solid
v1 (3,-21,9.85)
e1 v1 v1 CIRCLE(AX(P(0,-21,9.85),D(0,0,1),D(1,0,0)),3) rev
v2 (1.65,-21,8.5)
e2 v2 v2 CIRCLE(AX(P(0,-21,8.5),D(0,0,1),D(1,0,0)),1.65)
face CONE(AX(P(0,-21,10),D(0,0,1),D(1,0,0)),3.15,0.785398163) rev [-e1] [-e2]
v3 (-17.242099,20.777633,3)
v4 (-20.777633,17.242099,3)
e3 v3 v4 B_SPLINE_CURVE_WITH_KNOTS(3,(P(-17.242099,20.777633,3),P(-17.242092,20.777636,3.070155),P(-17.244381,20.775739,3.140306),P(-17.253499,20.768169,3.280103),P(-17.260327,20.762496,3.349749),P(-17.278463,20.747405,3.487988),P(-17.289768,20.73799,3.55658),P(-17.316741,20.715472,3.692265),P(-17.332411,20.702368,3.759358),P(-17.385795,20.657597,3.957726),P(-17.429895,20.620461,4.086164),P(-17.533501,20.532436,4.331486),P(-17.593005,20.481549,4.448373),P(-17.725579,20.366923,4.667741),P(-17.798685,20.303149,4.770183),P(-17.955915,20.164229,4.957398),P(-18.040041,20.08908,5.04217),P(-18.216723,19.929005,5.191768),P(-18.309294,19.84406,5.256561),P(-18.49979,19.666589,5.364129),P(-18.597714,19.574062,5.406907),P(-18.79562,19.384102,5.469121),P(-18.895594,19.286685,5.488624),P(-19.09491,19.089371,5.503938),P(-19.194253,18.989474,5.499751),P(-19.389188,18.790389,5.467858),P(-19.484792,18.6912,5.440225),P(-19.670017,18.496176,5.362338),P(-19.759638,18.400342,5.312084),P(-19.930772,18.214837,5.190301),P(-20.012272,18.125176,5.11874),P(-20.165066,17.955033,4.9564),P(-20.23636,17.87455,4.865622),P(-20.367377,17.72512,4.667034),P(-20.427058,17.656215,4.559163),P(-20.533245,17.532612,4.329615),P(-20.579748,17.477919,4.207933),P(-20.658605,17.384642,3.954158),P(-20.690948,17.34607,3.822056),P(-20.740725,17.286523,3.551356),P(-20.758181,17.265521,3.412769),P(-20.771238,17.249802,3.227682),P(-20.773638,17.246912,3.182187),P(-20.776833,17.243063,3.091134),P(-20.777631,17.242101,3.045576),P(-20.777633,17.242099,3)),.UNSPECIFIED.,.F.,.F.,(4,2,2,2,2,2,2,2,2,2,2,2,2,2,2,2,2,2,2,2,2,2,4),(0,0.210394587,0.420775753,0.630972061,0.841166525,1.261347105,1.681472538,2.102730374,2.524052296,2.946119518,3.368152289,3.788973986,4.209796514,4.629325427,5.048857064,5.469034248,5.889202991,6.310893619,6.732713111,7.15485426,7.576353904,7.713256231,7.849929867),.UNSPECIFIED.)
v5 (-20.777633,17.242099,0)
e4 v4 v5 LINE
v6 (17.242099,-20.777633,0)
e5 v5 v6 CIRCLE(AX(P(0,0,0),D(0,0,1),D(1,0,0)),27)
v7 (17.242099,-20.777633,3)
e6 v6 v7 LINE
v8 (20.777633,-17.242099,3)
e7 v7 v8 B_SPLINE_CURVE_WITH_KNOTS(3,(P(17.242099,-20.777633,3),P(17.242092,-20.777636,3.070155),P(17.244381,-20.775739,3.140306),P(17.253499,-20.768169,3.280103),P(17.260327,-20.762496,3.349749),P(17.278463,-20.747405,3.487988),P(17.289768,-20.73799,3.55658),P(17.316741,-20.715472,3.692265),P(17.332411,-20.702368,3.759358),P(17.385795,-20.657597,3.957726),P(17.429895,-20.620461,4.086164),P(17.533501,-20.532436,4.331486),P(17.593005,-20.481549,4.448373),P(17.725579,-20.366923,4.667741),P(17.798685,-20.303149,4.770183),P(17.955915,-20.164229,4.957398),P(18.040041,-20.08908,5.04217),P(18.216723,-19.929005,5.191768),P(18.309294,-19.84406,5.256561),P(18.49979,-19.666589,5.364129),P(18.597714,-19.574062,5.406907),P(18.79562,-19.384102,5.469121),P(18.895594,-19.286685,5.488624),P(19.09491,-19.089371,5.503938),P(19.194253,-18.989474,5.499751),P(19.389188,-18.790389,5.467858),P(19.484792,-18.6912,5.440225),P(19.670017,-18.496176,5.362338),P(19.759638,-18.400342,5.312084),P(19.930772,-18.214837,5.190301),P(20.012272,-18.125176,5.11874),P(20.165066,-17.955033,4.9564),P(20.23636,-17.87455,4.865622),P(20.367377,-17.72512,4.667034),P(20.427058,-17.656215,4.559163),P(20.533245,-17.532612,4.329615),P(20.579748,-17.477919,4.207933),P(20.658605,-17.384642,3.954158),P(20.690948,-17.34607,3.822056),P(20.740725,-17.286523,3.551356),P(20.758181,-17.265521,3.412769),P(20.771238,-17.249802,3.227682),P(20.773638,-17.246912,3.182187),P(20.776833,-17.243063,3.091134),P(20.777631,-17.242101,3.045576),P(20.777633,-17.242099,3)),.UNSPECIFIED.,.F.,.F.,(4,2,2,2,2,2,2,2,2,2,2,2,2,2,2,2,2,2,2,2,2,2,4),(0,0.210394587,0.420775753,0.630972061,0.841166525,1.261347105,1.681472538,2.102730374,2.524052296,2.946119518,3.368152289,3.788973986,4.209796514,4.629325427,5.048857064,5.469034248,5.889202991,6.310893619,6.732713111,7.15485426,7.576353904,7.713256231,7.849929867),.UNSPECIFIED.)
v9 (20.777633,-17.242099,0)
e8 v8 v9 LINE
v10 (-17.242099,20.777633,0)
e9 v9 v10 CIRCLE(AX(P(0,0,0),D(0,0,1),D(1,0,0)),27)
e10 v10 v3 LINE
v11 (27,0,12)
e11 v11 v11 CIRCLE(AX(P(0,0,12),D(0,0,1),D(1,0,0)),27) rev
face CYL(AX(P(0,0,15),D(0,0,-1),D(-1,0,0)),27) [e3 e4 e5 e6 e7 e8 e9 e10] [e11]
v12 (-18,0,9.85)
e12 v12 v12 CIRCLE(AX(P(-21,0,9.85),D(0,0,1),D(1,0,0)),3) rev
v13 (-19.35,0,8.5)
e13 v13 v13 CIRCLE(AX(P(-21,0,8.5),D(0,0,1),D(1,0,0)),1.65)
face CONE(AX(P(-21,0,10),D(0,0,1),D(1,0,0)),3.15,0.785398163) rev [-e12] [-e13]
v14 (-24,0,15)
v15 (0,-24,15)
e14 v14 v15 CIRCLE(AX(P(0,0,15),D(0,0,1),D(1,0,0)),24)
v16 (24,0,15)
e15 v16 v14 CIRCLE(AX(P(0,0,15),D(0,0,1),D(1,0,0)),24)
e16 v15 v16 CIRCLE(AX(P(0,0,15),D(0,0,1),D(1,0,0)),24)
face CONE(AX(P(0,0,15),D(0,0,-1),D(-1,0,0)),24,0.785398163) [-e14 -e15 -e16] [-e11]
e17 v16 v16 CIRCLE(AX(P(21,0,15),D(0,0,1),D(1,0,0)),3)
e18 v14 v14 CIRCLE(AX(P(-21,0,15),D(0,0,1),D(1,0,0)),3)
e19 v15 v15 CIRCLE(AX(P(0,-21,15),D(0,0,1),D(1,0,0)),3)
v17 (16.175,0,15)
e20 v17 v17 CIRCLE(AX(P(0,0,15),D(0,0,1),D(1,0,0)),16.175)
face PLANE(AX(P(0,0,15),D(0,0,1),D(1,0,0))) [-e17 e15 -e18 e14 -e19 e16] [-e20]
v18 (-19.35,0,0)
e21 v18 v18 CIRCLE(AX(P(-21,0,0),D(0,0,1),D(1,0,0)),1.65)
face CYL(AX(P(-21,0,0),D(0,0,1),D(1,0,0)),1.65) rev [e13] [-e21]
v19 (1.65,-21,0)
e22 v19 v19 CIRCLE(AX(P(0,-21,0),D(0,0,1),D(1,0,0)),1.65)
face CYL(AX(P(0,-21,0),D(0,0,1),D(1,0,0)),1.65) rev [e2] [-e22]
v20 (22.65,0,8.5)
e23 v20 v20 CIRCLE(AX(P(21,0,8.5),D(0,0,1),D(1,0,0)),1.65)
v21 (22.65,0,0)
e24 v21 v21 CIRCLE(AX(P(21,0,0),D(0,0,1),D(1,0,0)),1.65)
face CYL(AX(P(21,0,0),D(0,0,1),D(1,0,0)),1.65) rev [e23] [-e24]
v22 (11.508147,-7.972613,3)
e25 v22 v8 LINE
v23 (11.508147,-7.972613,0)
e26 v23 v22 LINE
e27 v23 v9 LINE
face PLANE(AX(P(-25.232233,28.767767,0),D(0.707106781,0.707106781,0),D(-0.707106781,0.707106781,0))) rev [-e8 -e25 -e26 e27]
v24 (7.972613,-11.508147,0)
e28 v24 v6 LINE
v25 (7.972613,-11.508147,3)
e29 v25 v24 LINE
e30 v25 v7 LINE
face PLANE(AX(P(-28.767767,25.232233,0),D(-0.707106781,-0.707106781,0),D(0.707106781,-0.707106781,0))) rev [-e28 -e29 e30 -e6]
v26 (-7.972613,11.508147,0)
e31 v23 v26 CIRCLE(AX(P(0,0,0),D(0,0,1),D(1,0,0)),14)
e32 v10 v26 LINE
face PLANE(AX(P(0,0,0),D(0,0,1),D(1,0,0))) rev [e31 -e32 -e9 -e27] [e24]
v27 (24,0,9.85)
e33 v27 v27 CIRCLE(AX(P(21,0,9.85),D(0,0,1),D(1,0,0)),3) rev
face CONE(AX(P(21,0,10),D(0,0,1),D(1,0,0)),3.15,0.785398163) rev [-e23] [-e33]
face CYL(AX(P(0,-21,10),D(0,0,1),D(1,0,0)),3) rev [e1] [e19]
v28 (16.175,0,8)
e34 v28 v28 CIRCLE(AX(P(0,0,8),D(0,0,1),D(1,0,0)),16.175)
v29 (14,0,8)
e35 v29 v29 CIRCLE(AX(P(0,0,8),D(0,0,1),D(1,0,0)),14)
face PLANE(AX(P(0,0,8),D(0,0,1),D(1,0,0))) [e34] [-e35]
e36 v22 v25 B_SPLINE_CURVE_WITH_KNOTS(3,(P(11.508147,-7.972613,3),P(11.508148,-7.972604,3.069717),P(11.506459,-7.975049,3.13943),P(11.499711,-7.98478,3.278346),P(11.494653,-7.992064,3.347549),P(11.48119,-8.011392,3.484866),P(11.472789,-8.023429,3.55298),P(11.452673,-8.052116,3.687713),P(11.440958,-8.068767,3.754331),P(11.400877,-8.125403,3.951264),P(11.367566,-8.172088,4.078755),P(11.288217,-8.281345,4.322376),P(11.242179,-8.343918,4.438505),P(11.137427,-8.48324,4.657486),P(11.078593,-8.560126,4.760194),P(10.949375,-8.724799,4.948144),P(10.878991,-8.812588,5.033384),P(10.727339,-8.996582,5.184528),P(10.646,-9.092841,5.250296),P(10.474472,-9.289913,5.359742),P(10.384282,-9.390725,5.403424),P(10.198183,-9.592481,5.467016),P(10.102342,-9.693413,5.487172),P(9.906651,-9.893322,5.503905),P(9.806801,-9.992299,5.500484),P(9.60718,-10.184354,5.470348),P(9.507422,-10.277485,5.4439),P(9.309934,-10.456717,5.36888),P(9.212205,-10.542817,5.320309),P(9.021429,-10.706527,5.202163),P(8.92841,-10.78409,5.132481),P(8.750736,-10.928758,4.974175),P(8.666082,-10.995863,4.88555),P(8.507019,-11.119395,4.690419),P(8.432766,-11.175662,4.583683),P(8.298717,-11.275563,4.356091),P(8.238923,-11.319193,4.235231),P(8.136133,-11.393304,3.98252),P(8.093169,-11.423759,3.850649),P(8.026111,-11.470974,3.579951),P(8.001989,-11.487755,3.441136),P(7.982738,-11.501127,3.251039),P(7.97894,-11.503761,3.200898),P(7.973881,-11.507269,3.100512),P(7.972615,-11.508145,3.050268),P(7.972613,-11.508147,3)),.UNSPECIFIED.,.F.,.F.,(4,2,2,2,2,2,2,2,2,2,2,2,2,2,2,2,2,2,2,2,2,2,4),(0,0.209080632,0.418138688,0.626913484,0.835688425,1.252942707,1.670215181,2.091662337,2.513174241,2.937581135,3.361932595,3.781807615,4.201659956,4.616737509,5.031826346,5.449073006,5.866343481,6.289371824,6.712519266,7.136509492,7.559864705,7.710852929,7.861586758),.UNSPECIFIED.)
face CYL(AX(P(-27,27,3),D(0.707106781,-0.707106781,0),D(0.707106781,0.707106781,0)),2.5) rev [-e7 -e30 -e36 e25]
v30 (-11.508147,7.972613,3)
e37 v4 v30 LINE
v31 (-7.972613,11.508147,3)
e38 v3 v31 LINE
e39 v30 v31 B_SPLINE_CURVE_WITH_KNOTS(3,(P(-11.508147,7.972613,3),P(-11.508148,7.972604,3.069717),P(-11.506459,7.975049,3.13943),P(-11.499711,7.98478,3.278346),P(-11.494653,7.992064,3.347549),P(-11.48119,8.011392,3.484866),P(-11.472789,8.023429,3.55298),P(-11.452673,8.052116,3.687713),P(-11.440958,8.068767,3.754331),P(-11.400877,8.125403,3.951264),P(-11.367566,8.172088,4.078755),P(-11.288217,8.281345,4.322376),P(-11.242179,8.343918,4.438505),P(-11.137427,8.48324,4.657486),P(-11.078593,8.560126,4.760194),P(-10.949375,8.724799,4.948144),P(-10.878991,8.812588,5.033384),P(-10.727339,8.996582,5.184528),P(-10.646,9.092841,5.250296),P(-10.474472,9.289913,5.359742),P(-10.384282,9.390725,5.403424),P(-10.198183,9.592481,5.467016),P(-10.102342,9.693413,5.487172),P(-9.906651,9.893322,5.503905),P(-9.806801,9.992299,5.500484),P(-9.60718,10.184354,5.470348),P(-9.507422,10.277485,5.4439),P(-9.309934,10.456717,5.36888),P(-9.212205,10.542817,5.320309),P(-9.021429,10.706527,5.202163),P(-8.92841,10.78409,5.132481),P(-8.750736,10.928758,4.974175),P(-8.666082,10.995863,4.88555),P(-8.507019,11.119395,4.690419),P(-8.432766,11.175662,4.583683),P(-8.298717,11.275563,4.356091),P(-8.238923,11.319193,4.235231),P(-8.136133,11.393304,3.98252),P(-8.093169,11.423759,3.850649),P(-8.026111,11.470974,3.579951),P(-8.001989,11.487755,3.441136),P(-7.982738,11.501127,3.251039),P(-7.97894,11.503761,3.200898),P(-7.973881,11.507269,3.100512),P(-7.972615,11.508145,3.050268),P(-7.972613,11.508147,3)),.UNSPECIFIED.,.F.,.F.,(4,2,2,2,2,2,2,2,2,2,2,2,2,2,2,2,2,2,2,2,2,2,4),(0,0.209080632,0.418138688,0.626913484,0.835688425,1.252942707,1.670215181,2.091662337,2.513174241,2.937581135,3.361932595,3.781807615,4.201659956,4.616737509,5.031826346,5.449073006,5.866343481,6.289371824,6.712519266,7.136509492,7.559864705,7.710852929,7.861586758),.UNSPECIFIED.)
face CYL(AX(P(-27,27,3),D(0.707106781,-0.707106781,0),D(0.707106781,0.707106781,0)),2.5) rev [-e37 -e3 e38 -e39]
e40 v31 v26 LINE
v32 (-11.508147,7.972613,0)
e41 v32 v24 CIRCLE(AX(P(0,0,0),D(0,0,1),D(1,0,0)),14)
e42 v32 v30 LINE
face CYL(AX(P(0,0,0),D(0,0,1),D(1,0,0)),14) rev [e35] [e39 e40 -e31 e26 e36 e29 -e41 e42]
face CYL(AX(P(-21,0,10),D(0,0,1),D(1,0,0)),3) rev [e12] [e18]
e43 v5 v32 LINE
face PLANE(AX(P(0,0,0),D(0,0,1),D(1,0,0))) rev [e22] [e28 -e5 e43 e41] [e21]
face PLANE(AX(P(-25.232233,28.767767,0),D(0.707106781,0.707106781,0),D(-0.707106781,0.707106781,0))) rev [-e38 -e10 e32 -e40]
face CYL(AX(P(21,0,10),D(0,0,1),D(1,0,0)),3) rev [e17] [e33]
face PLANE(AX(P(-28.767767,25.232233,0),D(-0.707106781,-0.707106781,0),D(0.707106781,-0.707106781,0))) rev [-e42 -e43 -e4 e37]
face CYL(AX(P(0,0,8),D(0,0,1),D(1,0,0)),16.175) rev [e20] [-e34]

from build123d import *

# Parameters (mm, degrees)
SKETCH_1_R               = 27
EXTRUDE_415_DEPTH        = 15
SKETCH_2_R               = 16.175
CUT_EXTRUDE_558_DEPTH    = 7
SKETCH_3_R               = 14
CUT_EXTRUDE_649_DEPTH    = 40.012818406
SKETCH_5_R               = 1.65
CUT_EXTRUDE_974_DEPTH    = 42.024382994
SKETCH_6_R               = 3
CUT_EXTRUDE_1153_DEPTH   = 5
CHAMFER_1_SIZE           = 1.5
CHAMFER_2_SIZE           = 3
CUT_EXTRUDE_1_DEPTH      = 42.024382994
CUT_EXTRUDE_1_DEPTH_BACK = 42.024382994


# Some blends are built 0.0001 mm under size
with BuildPart() as part:
    # Эскиз1 → Extrude 415 (new body)
    with BuildSketch(Plane.XY):
        Circle(SKETCH_1_R)
    extrude(amount=EXTRUDE_415_DEPTH)

    # Эскиз2 → Cut-Extrude 558 (cut)
    with BuildSketch(Plane.XY.offset(15)):
        Circle(SKETCH_2_R)
    extrude(amount=-CUT_EXTRUDE_558_DEPTH, mode=Mode.SUBTRACT)

    # Эскиз3 → Cut-Extrude 649 (cut, through all)
    with BuildSketch(Plane.XY.offset(8)):
        Circle(SKETCH_3_R)
    extrude(amount=-CUT_EXTRUDE_649_DEPTH, mode=Mode.SUBTRACT)

    # Эскиз5 → Cut-Extrude 974 (cut, through all)
    with BuildSketch(Plane.XY.offset(15)):
        with Locations((-21, 0)):
            Circle(SKETCH_5_R)
        with Locations((21, 0)):
            Circle(SKETCH_5_R)
        with Locations((0, -21)):
            Circle(SKETCH_5_R)
    extrude(amount=-CUT_EXTRUDE_974_DEPTH, mode=Mode.SUBTRACT)

    # Эскиз6 → Cut-Extrude 1153 (cut)
    with BuildSketch(Plane.XY.offset(15)):
        with Locations((-21, 0)):
            Circle(SKETCH_6_R)
        with Locations((21, 0)):
            Circle(SKETCH_6_R)
        with Locations((0, -21)):
            Circle(SKETCH_6_R)
    extrude(amount=-CUT_EXTRUDE_1153_DEPTH, mode=Mode.SUBTRACT)

    # Фаска1
    # the kernel refuses this chamfer: 1.5 mm, written as the material it takes off along each edge
    with BuildSketch(Plane(origin=(0, -21, 10), x_dir=(1, 0, 0), z_dir=(0, -1, 0))) as chamfer_1_piece_1_section:
        Polygon((1.65, -CHAMFER_1_SIZE), (1.65 + CHAMFER_1_SIZE, 0), (1.65, 0), align=None)
    chamfer_1_piece_1 = revolve(axis=Axis((0, -21, 10), (0, 0, 1)), mode=Mode.PRIVATE)
    chamfer_1_piece_1 = chamfer_1_piece_1 & Plane(origin=(0, -21, 9.171694066), x_dir=(1, 0, 0), z_dir=(0, 0, 1)) * Cylinder(3, 13, mode=Mode.PRIVATE)
    add(chamfer_1_piece_1, mode=Mode.SUBTRACT)
    with BuildSketch(Plane(origin=(21, 0, 10), x_dir=(1, 0, 0), z_dir=(0, -1, 0))) as chamfer_1_piece_2_section:
        Polygon((1.65, -CHAMFER_1_SIZE), (1.65 + CHAMFER_1_SIZE, 0), (1.65, 0), align=None)
    chamfer_1_piece_2 = revolve(axis=Axis((21, 0, 10), (0, 0, 1)), mode=Mode.PRIVATE)
    chamfer_1_piece_2 = chamfer_1_piece_2 & Plane(origin=(21, 0, 9.171694066), x_dir=(1, 0, 0), z_dir=(0, 0, 1)) * Cylinder(3, 13, mode=Mode.PRIVATE)
    add(chamfer_1_piece_2, mode=Mode.SUBTRACT)
    with BuildSketch(Plane(origin=(-21, 0, 10), x_dir=(1, 0, 0), z_dir=(0, -1, 0))) as chamfer_1_piece_3_section:
        Polygon((1.65, -CHAMFER_1_SIZE), (1.65 + CHAMFER_1_SIZE, 0), (1.65, 0), align=None)
    chamfer_1_piece_3 = revolve(axis=Axis((-21, 0, 10), (0, 0, 1)), mode=Mode.PRIVATE)
    chamfer_1_piece_3 = chamfer_1_piece_3 & Plane(origin=(-21, 0, 9.171694066), x_dir=(1, 0, 0), z_dir=(0, 0, 1)) * Cylinder(3, 13, mode=Mode.PRIVATE)
    add(chamfer_1_piece_3, mode=Mode.SUBTRACT)

    # Фаска2
    chamfer_2_edges = [part.edges().sort_by_distance(p)[0] for p in [
        (-27, 0, 15),
    ]]
    chamfer(chamfer_2_edges, length=CHAMFER_2_SIZE - 0.0001)  # a hair under: the kernel refuses the full size

    # Эскиз7 → Вырез-Вытянуть1 (cut, two sides: drawn at the far end of the back side and taken through both)
    with BuildSketch(Plane(origin=(0, 0, 0), x_dir=(0, 0, -1), z_dir=(0.7071067811865511, -0.707106781186544, 0)).offset(-CUT_EXTRUDE_1_DEPTH_BACK)):
        with BuildLine():
            Line((0, 2.5), (-3, 2.5))
            ThreePointArc((-3, 2.5), (-5.5, 0), (-3, -2.5))
            Line((-3, -2.5), (0, -2.5))
            Line((0, -2.5), (0, 2.5))
        make_face()
    extrude(amount=CUT_EXTRUDE_1_DEPTH + CUT_EXTRUDE_1_DEPTH_BACK, mode=Mode.SUBTRACT)


solid = part.part
